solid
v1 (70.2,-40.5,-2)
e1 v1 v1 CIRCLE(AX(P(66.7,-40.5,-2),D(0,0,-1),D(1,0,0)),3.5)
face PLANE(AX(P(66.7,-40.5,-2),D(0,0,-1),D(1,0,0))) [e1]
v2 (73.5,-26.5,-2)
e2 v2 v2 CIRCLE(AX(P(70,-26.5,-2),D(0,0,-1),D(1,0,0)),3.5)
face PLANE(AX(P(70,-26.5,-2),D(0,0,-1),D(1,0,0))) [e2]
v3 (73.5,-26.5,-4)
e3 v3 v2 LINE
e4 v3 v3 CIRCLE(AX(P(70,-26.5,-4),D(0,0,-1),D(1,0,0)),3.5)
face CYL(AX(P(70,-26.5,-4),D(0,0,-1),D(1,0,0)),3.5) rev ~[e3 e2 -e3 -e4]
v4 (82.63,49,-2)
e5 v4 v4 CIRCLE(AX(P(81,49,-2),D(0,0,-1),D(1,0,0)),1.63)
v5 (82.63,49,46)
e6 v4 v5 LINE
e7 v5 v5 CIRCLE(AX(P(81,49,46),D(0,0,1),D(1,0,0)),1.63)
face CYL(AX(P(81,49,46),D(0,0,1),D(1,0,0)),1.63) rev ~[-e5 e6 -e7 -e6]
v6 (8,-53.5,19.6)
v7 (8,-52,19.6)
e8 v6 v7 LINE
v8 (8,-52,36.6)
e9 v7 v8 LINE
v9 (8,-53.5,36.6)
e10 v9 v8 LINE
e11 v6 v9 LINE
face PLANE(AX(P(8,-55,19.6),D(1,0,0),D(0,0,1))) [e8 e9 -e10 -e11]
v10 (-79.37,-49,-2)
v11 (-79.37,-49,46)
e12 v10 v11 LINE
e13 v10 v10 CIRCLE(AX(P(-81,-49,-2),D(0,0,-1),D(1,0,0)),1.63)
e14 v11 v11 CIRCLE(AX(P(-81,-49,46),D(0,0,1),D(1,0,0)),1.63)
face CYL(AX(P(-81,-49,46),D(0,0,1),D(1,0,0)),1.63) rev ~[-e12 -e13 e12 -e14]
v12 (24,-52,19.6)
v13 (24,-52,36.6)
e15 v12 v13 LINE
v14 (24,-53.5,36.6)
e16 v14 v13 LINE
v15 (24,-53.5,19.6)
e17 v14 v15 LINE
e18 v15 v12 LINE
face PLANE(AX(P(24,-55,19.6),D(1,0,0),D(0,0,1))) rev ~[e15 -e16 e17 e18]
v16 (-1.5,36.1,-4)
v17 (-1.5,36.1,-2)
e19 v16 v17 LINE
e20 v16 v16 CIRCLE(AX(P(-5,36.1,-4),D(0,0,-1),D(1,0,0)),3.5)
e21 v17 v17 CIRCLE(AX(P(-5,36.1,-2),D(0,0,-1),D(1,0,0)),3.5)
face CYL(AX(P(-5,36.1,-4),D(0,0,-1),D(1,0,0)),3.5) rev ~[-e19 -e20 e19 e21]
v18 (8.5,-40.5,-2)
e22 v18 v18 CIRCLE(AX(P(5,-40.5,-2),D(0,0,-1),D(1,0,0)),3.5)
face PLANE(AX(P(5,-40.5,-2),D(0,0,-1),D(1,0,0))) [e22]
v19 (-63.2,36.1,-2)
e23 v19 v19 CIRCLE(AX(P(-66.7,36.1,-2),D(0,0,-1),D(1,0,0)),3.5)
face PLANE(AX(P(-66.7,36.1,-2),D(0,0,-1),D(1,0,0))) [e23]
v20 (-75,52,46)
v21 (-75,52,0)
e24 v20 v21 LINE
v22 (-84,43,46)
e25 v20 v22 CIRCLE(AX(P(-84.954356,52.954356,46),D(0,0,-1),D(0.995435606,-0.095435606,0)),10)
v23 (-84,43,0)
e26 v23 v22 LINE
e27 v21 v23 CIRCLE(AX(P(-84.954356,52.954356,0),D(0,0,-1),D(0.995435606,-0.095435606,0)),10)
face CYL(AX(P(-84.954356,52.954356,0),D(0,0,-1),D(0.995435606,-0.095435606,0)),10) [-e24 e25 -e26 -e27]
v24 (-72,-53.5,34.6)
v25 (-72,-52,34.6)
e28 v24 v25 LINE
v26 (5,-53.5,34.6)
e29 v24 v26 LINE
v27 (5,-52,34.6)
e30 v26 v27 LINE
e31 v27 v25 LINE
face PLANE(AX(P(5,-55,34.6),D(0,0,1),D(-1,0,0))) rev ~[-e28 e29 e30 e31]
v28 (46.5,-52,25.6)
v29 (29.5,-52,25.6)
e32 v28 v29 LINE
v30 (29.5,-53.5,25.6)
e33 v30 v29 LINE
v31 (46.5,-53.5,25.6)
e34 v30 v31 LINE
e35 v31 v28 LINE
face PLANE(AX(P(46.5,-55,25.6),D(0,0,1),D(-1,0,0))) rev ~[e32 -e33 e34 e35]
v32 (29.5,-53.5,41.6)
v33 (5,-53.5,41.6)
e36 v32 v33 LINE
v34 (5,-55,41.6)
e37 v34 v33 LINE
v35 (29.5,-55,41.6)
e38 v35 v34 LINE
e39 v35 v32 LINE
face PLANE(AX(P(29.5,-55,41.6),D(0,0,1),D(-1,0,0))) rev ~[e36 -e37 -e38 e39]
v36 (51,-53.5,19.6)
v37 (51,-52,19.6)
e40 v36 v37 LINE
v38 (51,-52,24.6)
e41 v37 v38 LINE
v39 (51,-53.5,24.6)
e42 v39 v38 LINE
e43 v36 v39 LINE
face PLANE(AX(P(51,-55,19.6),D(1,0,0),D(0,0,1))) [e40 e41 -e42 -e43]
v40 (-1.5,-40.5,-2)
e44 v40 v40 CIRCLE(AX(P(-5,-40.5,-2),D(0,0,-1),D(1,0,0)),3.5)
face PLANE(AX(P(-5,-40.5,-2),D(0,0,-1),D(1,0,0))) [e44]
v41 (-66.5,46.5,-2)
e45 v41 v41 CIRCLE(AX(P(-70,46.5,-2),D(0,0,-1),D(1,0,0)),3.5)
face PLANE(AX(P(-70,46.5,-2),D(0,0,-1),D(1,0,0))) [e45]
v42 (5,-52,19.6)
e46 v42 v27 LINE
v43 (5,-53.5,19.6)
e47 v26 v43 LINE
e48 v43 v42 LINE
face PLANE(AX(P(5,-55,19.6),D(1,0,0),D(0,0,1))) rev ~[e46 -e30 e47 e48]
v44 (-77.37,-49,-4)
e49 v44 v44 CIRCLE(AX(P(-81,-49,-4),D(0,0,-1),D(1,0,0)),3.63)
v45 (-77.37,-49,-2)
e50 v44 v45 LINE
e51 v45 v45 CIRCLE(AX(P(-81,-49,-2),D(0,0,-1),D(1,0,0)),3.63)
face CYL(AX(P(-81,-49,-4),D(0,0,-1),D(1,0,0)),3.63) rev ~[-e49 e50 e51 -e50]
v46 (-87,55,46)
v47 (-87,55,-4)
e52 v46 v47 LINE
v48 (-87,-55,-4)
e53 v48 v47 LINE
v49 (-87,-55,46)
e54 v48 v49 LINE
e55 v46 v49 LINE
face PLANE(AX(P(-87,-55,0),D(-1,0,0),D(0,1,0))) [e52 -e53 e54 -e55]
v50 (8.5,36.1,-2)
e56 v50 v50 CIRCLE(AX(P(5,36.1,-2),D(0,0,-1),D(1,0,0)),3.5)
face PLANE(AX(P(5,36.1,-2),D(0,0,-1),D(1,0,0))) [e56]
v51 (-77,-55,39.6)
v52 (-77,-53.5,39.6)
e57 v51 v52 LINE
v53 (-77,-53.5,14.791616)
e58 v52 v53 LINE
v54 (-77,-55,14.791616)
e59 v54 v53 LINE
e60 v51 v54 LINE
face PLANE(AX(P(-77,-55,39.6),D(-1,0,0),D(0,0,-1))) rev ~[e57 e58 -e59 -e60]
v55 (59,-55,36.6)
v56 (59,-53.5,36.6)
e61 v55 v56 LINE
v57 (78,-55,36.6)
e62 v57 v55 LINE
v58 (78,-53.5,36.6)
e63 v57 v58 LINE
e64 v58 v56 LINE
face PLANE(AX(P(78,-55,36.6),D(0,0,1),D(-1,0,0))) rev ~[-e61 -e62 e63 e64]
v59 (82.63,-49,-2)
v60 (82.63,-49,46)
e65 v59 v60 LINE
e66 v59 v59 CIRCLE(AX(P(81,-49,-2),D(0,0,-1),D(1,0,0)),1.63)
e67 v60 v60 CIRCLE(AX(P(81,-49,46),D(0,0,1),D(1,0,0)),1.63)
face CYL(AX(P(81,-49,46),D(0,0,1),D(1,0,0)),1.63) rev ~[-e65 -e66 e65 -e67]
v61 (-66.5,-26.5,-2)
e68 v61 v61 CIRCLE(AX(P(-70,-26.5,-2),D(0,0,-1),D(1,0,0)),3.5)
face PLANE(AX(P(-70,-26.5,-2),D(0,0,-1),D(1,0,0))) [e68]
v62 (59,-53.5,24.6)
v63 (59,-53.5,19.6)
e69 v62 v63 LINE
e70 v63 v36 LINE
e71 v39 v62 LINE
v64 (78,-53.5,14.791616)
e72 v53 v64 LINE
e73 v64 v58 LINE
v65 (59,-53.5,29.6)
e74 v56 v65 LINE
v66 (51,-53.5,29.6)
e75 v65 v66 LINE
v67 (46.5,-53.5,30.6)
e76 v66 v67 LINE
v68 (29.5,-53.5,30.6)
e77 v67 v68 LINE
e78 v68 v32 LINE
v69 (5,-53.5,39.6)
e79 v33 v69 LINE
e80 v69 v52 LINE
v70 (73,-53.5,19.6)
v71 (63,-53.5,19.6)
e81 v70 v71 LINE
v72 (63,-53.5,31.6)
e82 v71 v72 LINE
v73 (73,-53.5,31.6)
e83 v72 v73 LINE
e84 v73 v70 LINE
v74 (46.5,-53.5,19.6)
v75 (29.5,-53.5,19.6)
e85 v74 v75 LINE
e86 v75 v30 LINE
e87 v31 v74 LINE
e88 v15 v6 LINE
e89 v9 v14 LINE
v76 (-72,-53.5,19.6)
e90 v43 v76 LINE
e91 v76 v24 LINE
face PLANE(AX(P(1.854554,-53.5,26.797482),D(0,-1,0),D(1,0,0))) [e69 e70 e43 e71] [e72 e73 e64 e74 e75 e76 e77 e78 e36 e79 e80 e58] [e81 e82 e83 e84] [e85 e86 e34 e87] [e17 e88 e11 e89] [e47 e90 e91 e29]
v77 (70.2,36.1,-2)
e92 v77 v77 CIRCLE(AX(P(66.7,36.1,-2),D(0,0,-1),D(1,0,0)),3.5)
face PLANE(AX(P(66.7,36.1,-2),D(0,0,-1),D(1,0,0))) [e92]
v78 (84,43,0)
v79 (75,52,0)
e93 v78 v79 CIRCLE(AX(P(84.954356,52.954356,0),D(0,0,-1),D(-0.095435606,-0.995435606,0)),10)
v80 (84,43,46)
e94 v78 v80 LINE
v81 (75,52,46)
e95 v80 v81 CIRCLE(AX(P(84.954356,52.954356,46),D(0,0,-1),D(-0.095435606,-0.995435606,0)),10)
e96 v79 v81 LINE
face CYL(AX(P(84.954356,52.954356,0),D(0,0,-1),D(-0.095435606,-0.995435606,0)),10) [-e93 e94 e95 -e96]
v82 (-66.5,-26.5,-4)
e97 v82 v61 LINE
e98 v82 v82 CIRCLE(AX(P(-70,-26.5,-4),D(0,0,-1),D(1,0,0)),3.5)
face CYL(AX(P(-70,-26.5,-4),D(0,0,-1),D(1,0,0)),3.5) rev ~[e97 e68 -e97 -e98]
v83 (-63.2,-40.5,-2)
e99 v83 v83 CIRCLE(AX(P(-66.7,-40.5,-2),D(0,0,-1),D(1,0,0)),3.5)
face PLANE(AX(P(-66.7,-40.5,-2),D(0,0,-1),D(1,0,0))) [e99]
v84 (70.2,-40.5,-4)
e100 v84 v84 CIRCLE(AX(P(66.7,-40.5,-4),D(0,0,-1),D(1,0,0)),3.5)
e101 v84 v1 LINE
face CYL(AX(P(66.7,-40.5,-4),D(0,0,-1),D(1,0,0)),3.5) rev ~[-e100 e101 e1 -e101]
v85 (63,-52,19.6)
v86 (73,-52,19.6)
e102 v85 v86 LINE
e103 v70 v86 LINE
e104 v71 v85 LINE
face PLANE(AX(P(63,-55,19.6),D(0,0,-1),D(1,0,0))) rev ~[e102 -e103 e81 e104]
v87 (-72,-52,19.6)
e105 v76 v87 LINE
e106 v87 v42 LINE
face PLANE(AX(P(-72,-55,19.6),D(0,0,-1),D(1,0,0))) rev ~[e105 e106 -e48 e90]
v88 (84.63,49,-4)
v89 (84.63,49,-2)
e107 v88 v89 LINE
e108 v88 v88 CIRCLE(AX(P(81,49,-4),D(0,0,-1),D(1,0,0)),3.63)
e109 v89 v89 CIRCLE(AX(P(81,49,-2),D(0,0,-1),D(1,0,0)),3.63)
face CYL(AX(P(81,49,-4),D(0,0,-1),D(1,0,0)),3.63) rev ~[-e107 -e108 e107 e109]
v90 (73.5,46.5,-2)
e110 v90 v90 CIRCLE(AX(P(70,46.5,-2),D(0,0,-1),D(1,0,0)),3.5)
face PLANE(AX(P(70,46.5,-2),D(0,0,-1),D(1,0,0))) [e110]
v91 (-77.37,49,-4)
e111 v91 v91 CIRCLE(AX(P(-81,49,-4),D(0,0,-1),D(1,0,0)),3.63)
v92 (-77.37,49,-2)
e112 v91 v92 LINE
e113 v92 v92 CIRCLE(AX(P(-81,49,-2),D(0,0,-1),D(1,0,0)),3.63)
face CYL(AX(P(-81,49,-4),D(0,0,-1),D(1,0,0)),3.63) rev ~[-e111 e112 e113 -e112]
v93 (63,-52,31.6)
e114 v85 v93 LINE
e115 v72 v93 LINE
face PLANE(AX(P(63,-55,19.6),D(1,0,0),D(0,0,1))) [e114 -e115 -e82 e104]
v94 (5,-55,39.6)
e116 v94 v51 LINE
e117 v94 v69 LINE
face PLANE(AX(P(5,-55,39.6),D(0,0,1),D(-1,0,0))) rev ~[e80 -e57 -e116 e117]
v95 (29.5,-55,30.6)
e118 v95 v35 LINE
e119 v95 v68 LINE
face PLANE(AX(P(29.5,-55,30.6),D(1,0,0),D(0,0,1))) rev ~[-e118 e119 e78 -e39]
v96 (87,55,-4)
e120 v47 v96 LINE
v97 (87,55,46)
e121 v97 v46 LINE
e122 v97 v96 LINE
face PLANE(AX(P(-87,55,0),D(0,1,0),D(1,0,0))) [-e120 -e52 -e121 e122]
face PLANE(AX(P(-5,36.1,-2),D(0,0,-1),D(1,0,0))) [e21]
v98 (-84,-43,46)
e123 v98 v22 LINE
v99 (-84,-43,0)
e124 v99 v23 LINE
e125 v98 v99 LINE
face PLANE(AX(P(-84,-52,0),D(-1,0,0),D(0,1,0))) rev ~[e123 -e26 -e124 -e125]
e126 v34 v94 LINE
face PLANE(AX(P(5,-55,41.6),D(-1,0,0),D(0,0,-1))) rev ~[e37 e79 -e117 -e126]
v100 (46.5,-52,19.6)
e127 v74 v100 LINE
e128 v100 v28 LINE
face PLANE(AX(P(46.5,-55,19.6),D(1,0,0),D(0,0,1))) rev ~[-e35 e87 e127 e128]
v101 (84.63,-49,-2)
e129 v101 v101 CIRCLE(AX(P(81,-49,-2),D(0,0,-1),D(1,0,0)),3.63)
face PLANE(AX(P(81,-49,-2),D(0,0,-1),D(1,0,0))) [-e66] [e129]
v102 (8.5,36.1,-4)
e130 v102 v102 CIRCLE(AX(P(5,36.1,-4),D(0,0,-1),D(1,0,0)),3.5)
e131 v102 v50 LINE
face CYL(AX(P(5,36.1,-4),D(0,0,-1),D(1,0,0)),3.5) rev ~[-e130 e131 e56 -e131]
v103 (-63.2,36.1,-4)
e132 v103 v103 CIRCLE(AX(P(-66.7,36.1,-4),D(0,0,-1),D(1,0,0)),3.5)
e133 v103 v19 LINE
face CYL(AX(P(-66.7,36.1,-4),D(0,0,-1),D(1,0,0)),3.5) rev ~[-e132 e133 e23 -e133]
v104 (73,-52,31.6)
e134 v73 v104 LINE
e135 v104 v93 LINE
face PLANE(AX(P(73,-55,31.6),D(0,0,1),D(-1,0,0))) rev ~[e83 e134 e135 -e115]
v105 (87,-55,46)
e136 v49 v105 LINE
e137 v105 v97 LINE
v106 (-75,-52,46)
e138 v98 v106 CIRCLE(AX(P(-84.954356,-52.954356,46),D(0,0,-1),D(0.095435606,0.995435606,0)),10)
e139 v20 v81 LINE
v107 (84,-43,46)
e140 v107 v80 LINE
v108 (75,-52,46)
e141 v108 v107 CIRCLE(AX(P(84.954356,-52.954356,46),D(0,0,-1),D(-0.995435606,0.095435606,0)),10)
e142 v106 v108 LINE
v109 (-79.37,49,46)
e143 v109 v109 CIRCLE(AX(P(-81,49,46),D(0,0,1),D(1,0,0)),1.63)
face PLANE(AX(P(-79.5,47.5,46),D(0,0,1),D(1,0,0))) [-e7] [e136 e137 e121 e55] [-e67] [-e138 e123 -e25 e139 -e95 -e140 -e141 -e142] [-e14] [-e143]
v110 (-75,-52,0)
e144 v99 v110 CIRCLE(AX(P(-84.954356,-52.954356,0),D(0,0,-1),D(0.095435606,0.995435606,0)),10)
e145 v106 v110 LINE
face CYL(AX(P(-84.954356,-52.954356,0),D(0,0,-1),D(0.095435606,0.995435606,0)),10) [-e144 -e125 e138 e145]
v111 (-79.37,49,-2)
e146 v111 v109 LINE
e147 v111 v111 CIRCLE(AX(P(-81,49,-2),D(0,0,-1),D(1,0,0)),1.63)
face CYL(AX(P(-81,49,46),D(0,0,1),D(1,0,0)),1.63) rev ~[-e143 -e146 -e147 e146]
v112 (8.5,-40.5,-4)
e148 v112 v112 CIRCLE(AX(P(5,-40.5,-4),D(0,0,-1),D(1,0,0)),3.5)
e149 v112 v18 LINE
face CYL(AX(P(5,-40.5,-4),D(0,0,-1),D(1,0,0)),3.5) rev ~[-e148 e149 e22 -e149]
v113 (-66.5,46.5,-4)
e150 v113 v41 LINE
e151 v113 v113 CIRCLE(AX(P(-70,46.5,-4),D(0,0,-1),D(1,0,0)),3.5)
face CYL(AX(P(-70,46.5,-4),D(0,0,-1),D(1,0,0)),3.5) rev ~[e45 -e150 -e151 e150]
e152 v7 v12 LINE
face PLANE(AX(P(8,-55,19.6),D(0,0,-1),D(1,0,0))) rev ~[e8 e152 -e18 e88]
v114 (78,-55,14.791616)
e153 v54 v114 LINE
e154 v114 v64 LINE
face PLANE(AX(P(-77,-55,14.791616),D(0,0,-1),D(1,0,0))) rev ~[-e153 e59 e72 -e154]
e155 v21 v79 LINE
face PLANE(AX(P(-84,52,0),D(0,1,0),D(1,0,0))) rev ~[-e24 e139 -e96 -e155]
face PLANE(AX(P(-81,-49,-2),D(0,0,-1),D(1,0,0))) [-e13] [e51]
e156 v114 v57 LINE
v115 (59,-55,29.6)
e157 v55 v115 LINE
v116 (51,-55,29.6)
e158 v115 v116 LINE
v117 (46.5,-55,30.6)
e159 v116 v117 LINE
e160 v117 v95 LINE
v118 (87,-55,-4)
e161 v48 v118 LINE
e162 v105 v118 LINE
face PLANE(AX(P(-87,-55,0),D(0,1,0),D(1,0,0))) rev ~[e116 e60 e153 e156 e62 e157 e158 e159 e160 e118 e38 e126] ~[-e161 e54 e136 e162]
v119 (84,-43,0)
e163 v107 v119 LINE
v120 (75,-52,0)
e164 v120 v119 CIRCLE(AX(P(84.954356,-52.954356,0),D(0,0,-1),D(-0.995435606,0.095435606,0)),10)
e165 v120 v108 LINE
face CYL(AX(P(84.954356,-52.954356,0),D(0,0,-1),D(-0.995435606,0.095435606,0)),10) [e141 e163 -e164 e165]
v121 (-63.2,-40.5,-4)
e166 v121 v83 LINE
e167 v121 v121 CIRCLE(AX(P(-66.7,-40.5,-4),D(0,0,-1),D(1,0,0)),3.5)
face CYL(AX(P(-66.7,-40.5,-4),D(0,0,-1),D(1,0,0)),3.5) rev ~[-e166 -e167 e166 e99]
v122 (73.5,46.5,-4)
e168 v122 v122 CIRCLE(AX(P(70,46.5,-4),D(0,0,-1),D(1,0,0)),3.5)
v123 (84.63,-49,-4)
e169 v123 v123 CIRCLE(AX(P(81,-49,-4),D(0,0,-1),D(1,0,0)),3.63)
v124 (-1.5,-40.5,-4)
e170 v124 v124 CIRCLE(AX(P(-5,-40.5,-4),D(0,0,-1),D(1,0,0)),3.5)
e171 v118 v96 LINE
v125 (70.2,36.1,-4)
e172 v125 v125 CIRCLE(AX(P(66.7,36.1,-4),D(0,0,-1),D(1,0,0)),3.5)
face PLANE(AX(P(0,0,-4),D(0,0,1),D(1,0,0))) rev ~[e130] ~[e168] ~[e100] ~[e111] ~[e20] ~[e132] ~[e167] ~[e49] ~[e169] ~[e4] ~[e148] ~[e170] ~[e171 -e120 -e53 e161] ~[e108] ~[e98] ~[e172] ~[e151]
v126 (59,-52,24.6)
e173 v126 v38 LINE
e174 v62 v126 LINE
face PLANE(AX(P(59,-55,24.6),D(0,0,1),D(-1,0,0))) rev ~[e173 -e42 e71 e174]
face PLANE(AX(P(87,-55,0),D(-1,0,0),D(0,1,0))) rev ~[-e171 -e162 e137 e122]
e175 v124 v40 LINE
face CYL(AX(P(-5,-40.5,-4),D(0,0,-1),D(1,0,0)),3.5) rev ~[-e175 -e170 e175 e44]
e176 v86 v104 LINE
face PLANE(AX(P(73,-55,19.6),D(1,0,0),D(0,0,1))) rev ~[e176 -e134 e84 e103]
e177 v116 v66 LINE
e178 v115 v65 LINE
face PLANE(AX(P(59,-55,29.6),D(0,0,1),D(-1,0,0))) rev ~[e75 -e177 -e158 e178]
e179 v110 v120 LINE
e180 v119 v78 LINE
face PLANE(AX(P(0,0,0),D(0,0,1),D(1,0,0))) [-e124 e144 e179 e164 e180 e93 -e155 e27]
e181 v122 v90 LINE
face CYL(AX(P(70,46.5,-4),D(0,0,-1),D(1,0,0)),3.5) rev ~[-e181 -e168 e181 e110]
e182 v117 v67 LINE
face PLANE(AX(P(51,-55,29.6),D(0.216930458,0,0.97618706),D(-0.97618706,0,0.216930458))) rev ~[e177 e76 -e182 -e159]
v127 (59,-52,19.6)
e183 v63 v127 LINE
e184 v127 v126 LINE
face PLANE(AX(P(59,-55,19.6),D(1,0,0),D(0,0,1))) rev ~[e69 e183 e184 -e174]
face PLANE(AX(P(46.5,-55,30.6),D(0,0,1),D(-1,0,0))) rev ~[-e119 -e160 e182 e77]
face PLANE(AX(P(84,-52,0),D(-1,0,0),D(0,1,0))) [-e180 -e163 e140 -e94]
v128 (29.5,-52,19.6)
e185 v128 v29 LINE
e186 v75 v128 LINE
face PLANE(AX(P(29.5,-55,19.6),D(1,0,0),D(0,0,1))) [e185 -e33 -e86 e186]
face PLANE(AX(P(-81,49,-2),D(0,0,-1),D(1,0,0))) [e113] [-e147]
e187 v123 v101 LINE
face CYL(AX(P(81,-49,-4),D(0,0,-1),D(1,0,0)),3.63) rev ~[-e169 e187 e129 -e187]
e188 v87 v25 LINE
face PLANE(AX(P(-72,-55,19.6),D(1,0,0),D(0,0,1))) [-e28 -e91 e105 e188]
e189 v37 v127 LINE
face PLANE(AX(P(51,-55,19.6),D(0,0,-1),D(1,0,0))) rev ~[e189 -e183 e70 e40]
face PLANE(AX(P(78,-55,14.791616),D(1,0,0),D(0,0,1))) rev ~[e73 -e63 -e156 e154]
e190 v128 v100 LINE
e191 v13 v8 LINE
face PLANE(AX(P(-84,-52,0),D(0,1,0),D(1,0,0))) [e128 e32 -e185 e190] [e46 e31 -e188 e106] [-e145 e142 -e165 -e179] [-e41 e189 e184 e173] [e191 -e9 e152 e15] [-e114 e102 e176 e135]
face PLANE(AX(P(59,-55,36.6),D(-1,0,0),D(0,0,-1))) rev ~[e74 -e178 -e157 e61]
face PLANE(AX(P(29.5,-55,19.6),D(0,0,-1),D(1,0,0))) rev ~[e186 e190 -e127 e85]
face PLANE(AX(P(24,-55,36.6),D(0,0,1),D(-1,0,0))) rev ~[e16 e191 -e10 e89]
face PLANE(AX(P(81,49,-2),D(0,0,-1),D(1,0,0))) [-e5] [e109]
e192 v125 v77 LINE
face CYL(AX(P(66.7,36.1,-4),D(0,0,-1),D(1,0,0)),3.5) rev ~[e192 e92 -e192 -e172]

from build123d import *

# Parameters (mm, degrees)
F0_W         = 174
F0_H         = 110
F1_DEPTH     = 4
F2_W         = 174
F2_H         = 110
F2_W_2       = 168
F2_H_2       = 104
F3_DEPTH     = 46
F5_R         = 3.5
F6_DEPTH     = 2
F7_W         = 38.5
F7_H         = 15
F7_W_2       = 8
F7_H_2       = 17
F7_W_3       = 8.5
F7_H_3       = 6
F7_W_4       = 4
F7_H_4       = 5
F7_W_5       = 5
F7_H_5       = 12
F8_DEPTH     = 3
F9_W         = 9
F9_H         = 9
F9_R         = 1.63
F10_DEPTH    = 46
F11_DEPTH    = 50.001
F12_T1_DEPTH = 68.5
F13_R        = 3.63
F13_R_2      = 1.63
F14_DEPTH    = 2
F15_DEPTH    = 1.5


# Not quite as in the source:
# - a fillet or chamfer that OpenCascade refuses, or shapes differently, is made with other operations: its cross-section is extruded or revolved along the edge and cut away or added


with BuildPart() as f1:
    # F0 (on Top) → F1 (new body)
    with BuildSketch(Plane.XY):
        Rectangle(F0_W, F0_H)
    extrude(amount=-F1_DEPTH)

    # F2 (on face) → F3 (join)
    with BuildSketch(Plane.XY):
        Rectangle(F2_W, F2_H)
        Rectangle(F2_W_2, F2_H_2, mode=Mode.SUBTRACT)
    extrude(amount=F3_DEPTH)

    # F5 (on face) → F6 (cut)
    with BuildSketch(Plane(origin=(0, 0, -4), x_dir=(1, 0, 0), z_dir=(0, 0, -1))):
        with Locations((-66.7, 40.5)):
            Circle(F5_R)
        with Locations((-70, 26.5)):
            Circle(F5_R)
        with Locations((-66.7, -36.1)):
            Circle(F5_R)
        with Locations((-70, -46.5)):
            Circle(F5_R)
        with Locations((-5, -36.1)):
            Circle(F5_R)
        with Locations((5, -36.1)):
            Circle(F5_R)
        with Locations((-5, 40.5)):
            Circle(F5_R)
        with Locations((5, 40.5)):
            Circle(F5_R)
        with Locations((66.7, 40.5)):
            Circle(F5_R)
        with Locations((70, 26.5)):
            Circle(F5_R)
        with Locations((66.7, -36.1)):
            Circle(F5_R)
        with Locations((70, -46.5)):
            Circle(F5_R)
    extrude(amount=-F6_DEPTH, mode=Mode.SUBTRACT)

    # F7 (on face) → F8 (cut)
    with BuildSketch(Plane.XZ.offset(55)):
        with Locations((-52.75, 27.1)):
            Rectangle(F7_W, F7_H)
        with Locations((-14.25, 27.1)):
            Rectangle(F7_W, F7_H)
        with Locations((12, 28.1)):
            Rectangle(F7_W_2, F7_H_2)
        with Locations((20, 28.1)):
            Rectangle(F7_W_2, F7_H_2)
        with Locations((33.75, 22.6)):
            Rectangle(F7_W_3, F7_H_3)
        with Locations((42.25, 22.6)):
            Rectangle(F7_W_3, F7_H_3)
        with Locations((53, 22.1)):
            Rectangle(F7_W_4, F7_H_4)
        with Locations((57, 22.1)):
            Rectangle(F7_W_4, F7_H_4)
        with Locations((65.5, 25.6)):
            Rectangle(F7_W_5, F7_H_5)
        with Locations((70.5, 25.6)):
            Rectangle(F7_W_5, F7_H_5)
    extrude(amount=-F8_DEPTH, mode=Mode.SUBTRACT)

    # F9 (on face) → F10 (join)
    with BuildSketch(Plane.XY.offset(46)):
        with Locations((-79.5, 47.5)):
            Rectangle(F9_W, F9_H)
        with Locations((-81, 49)):
            Circle(F9_R, mode=Mode.SUBTRACT)
        Polygon((-75, 55), (-87, 55), (-87, 43), (-84, 43), (-84, 52), (-75, 52), align=None)
        Polygon((87, 55), (75, 55), (75, 52), (84, 52), (84, 43), (87, 43), align=None)
        with Locations((79.5, 47.5)):
            Rectangle(F9_W, F9_H)
        with Locations((81, 49)):
            Circle(F9_R, mode=Mode.SUBTRACT)
        Polygon((87, -55), (87, -43), (84, -43), (84, -52), (75, -52), (75, -55), align=None)
        with Locations((79.5, -47.5)):
            Rectangle(F9_W, F9_H)
        with Locations((81, -49)):
            Circle(F9_R, mode=Mode.SUBTRACT)
        with Locations((-79.5, -47.5)):
            Rectangle(F9_W, F9_H)
        with Locations((-81, -49)):
            Circle(F9_R, mode=Mode.SUBTRACT)
        Polygon((-84, -43), (-87, -43), (-87, -55), (-75, -55), (-75, -52), (-84, -52), align=None)
    extrude(amount=-F10_DEPTH)

    # F9 (on face) → F11 (cut, through all)
    with BuildSketch(Plane.XY.offset(46)):
        with Locations((-81, 49)):
            Circle(F9_R)
        with Locations((81, 49)):
            Circle(F9_R)
        with Locations((81, -49)):
            Circle(F9_R)
        with Locations((-81, -49)):
            Circle(F9_R)
    extrude(amount=-F11_DEPTH, mode=Mode.SUBTRACT)

    # F12: fillet of radius 10 on 4 edges, made by hand

    # F12_s2 → F12_t1 (cut)
    with BuildSketch(Plane.XY):
        with BuildLine():
            ThreePointArc((-75, 52), (-77.8832882455, 45.8832882455), (-84, 43))
            Line((-84, 43), (-75, 43))
            Line((-75, 43), (-75, 52))
        make_face()
        with BuildLine():
            ThreePointArc((84, 43), (77.8832882455, 45.8832882455), (75, 52))
            Line((75, 52), (75, 43))
            Line((75, 43), (84, 43))
        make_face()
        with BuildLine():
            ThreePointArc((-84, -43), (-77.8832882455, -45.8832882455), (-75, -52))
            Line((-75, -52), (-75, -43))
            Line((-75, -43), (-84, -43))
        make_face()
        with BuildLine():
            ThreePointArc((75, -52), (77.8832882455, -45.8832882455), (84, -43))
            Line((84, -43), (75, -43))
            Line((75, -43), (75, -52))
        make_face()
    extrude(amount=F12_T1_DEPTH, mode=Mode.SUBTRACT)

    # F13 (on face) → F14 (cut)
    with BuildSketch(Plane(origin=(0, 0, -4), x_dir=(1, 0, 0), z_dir=(0, 0, -1))):
        with Locations((-81, 49)):
            Circle(F13_R)
        with Locations((-81, 49)):
            Circle(F13_R_2, mode=Mode.SUBTRACT)
        with Locations((81, 49)):
            Circle(F13_R)
        with Locations((81, 49)):
            Circle(F13_R_2, mode=Mode.SUBTRACT)
        with Locations((81, -49)):
            Circle(F13_R)
        with Locations((81, -49)):
            Circle(F13_R_2, mode=Mode.SUBTRACT)
        with Locations((-81, -49)):
            Circle(F13_R)
        with Locations((-81, -49)):
            Circle(F13_R_2, mode=Mode.SUBTRACT)
    extrude(amount=-F14_DEPTH, mode=Mode.SUBTRACT)

    # F7 (on face) → F15 (cut)
    with BuildSketch(Plane.XZ.offset(55)):
        Polygon((-77, 34.6), (-77, 19.7916162387), (-77, 14.7916162387), (78, 14.7916162387), (78, 19.6), (78, 31.6), (78, 36.6), (73, 36.6), (68, 36.6), (63, 36.6), (59, 36.6), (59, 29.6), (55, 29.6), (51, 29.6), (46.5, 30.6), (38, 30.6), (29.5, 30.6), (29.5, 41.6), (24, 41.6), (16, 41.6), (8, 41.6), (5, 41.6), (5, 39.6), (-33.5, 39.6), (-72, 39.6), (-77, 39.6), align=None)
        Polygon((5, 19.6), (-33.5, 19.6), (-72, 19.6), (-72, 34.6), (-33.5, 34.6), (5, 34.6), align=None, mode=Mode.SUBTRACT)
        Polygon((46.5, 19.6), (38, 19.6), (29.5, 19.6), (29.5, 25.6), (38, 25.6), (46.5, 25.6), align=None, mode=Mode.SUBTRACT)
        Polygon((24, 19.6), (16, 19.6), (8, 19.6), (8, 36.6), (16, 36.6), (24, 36.6), align=None, mode=Mode.SUBTRACT)
        Polygon((59, 19.6), (55, 19.6), (51, 19.6), (51, 24.6), (55, 24.6), (59, 24.6), align=None, mode=Mode.SUBTRACT)
        Polygon((73, 19.6), (68, 19.6), (63, 19.6), (63, 31.6), (68, 31.6), (73, 31.6), align=None, mode=Mode.SUBTRACT)
    extrude(amount=-F15_DEPTH, mode=Mode.SUBTRACT)


solid = f1.part
